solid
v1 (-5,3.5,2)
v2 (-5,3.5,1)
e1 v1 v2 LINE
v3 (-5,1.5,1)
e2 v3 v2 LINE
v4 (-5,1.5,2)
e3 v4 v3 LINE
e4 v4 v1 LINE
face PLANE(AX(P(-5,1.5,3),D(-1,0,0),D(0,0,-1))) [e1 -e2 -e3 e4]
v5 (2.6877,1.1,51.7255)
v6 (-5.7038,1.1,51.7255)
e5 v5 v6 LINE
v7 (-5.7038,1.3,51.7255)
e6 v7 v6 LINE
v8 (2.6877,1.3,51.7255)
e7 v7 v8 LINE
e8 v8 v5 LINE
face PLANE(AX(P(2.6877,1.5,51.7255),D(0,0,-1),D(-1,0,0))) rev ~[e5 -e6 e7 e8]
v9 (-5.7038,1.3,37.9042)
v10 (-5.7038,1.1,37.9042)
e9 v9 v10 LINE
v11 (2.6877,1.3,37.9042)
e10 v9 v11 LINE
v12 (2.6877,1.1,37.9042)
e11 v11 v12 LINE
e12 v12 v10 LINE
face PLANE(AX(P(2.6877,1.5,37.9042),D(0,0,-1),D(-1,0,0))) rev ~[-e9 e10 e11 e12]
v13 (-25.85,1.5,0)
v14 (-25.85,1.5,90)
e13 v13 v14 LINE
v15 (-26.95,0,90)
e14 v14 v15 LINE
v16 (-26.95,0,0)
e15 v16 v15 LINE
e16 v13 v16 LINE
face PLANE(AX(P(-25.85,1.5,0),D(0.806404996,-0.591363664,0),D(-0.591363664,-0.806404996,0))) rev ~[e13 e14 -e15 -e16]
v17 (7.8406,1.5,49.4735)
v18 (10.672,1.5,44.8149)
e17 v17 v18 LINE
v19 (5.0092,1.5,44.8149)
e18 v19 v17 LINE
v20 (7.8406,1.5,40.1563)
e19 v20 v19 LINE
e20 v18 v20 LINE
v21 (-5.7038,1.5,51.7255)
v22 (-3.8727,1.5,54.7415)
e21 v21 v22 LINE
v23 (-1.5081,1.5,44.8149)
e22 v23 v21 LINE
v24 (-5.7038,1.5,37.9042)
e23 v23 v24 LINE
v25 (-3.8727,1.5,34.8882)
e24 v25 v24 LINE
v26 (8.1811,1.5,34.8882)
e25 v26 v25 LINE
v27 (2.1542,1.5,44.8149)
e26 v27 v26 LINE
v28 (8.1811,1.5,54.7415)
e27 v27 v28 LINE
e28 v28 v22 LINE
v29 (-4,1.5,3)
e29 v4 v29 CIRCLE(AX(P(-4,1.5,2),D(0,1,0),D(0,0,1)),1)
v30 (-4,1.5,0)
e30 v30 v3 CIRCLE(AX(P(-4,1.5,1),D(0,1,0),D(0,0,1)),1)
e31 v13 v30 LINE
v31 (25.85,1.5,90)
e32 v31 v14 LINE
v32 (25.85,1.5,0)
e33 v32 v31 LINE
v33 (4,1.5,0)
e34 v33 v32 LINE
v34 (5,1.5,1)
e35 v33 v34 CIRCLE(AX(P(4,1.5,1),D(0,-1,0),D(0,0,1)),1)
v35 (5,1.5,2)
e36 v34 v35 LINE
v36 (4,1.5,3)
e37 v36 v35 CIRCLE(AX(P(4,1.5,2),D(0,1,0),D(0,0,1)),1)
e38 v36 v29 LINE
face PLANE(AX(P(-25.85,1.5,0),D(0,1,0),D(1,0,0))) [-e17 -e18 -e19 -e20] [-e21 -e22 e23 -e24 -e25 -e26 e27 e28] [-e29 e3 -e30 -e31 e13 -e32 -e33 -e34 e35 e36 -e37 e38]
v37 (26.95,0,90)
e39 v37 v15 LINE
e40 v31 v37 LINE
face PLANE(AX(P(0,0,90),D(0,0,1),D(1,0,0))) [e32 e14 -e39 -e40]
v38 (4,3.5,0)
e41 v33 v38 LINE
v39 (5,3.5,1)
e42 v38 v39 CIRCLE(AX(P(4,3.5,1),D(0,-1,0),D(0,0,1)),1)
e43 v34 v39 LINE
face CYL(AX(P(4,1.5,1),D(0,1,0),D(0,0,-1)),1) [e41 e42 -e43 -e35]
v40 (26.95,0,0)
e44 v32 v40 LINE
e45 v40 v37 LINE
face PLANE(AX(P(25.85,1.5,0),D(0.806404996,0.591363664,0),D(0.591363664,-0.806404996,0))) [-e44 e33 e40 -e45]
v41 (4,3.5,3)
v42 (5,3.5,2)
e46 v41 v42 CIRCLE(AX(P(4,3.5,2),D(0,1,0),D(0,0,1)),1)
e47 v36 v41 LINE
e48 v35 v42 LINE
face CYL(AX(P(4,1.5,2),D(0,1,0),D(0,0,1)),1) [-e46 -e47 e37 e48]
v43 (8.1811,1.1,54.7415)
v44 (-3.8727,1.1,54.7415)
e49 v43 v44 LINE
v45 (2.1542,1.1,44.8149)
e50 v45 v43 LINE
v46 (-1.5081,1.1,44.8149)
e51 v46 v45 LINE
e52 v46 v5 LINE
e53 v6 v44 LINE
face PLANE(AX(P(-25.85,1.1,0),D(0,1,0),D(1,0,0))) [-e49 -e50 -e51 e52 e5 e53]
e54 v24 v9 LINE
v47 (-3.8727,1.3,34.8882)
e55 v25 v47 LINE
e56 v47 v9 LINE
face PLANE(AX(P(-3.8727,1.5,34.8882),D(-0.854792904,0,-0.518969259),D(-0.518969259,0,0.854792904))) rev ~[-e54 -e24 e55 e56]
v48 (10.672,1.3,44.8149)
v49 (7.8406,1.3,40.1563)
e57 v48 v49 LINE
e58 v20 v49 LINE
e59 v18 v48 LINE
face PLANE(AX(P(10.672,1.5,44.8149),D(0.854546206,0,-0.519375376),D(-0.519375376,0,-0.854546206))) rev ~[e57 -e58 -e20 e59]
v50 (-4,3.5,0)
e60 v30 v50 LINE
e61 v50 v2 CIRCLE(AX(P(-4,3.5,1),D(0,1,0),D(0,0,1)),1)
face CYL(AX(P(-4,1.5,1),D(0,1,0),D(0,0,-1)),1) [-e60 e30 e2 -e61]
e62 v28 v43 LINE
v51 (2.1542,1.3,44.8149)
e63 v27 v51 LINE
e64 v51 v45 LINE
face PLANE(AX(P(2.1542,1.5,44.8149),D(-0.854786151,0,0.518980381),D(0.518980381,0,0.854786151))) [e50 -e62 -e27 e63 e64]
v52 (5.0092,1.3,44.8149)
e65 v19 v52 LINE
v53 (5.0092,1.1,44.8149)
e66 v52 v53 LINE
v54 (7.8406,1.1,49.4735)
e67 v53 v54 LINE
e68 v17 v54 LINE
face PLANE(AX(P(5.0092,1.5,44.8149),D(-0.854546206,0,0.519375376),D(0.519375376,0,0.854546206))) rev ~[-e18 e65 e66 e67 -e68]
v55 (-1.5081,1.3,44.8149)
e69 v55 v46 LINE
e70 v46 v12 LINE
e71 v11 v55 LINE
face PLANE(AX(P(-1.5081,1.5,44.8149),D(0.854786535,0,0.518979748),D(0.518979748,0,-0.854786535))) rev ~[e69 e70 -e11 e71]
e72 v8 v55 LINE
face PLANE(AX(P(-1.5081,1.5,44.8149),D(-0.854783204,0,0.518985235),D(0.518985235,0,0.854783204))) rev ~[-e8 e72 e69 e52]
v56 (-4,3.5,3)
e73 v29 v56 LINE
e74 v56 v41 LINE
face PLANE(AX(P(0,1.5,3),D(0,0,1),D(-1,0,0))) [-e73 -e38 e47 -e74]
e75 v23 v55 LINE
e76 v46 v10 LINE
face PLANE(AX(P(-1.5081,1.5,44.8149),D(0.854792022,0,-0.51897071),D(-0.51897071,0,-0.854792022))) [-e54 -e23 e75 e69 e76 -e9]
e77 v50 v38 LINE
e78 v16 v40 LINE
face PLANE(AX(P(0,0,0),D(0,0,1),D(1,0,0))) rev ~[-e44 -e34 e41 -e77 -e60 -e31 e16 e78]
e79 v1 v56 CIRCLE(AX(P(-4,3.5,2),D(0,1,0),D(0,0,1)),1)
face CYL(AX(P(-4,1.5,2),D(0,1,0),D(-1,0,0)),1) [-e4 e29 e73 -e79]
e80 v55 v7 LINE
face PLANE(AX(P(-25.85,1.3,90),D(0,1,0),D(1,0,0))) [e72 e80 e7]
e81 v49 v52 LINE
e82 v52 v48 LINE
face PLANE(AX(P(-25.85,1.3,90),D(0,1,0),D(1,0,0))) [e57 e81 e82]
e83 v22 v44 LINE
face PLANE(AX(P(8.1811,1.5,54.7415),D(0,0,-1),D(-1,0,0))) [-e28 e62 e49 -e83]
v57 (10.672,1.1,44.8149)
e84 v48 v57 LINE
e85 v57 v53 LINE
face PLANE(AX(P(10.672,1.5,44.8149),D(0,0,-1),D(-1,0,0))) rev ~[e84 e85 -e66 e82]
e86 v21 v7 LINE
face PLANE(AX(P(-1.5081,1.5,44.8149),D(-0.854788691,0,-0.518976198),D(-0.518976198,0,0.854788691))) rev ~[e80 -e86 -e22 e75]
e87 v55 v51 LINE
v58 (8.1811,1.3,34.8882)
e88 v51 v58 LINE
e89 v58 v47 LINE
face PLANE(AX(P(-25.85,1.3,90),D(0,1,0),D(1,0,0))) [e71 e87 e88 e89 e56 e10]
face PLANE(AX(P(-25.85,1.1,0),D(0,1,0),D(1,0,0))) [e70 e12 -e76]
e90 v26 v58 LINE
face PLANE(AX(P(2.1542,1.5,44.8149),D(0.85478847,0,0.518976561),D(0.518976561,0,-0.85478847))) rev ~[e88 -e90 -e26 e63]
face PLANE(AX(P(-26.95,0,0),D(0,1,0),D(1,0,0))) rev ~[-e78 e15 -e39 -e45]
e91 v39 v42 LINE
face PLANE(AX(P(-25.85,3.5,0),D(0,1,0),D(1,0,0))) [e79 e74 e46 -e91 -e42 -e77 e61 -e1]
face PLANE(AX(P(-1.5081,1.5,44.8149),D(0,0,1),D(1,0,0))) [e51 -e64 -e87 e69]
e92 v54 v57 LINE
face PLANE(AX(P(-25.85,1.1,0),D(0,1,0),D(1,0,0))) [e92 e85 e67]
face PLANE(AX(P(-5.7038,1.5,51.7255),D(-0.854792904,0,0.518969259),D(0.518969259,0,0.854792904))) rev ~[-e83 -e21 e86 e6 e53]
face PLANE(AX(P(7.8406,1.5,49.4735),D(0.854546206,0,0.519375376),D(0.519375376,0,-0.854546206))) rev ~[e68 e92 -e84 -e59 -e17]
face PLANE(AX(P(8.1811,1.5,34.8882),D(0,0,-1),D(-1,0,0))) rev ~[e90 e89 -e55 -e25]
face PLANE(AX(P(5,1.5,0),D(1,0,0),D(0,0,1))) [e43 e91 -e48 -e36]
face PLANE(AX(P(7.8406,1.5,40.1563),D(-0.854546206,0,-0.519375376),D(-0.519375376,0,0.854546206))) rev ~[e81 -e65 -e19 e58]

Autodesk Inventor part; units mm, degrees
ref_plane "YZ Plane" through (0, 0, 0) normal (1, 0, 0) x (0, 1, 0)
ref_plane "XZ Plane" through (0, 0, 0) normal (0, 1, 0) x (-1, 0, 0)
ref_plane "XY Plane" through (0, 0, 0) normal (0, 0, 1) x (1, 0, 0)
sketch "Эскиз1" plane through (0, 0, 0) normal (0, 0, 1) x (1, 0, 0)
  line L0 (0, -0.6) -> (0, 3.6) projected
  line L1 (0, 0) -> (0, 3)
  line L2 (-24.75, 3) -> (24.75, 3)
  line L3 (-26.95, 0) -> (26.95, 0)
  line L4 (-24.75, 3) -> (-26.95, 0)
  line L5 (24.75, 3) -> (26.95, 0)
  line L6 (-25.85, 1.5) -> (25.85, 1.5)
  dimension "d1" = 3
  dimension "d3" = 49.5
  dimension "d4" = 53.9
extrude "Выдавливание1" add sketch "Эскиз1" along normal blind 90 contours L3 L4 L6 L0 | L0 L6 L5 L3
sketch "Эскиз2" plane through (-25.85, 1.5, 0) normal (0, 1, 0) x (1, 0, 0)
  line L0 (-1.1, 0) -> (52.8, 0) projected
  line L1 (20.85, 0) -> (30.85, 0)
  line L2 (30.85, 0) -> (30.85, -3)
  line L3 (30.85, -3) -> (20.85, -3)
  line L4 (20.85, -3) -> (20.85, 0)
  line L5 (25.85, 18) -> (25.85, -108) projected
  point P0 (25.85, 0)
  dimension "d7" = 10
  dimension "d8" = 3
extrude "Выдавливание2" add sketch "Эскиз2" along normal blind 2
fillet "Сопряжение1" radius 1 4 edges at (5, 2.5, 3) (5, 2.5, 0) (-5, 2.5, 3) (-5, 2.5, 0)
sketch "Эскиз7" plane through (-25.85, 1.5, 90) normal (0, 1, 0) x (1, 0, 0)
  line L0 (0, 90) -> (-1.1, 90) projected
  line L1 (45.7625, 90) -> (45.7625, 0) construction
  line L2 (45.7625, 0) -> (5.9375, 0) construction
  line L3 (5.9375, 0) -> (5.9375, 90) construction
  line L4 (5.9375, 90) -> (45.7625, 90) construction
  line L5 (51.7, 0) -> (0, 0) projected
  line L6 (-1.1, 0) -> (52.8, 0) projected
  line L7 (21.9773, 55.1118) -> (20.1462, 52.0958)
  line L8 (20.1462, 52.0958) -> (24.3419, 45.1851)
  line L9 (21.9773, 55.1118) -> (34.0311, 55.1118)
  line L10 (34.0311, 55.1118) -> (28.0042, 45.1851)
  line L11 (28.0042, 45.1851) -> (24.3419, 45.1851)
  line L12 (20.1462, 52.0958) -> (28.5377, 52.0958)
  line L13 (28.5377, 52.0958) -> (24.3419, 45.1851)
  line L14 (30.8592, 45.1851) -> (36.522, 45.1851)
  line L15 (36.522, 45.1851) -> (33.6906, 49.8437)
  line L16 (33.6906, 49.8437) -> (30.8592, 45.1851)
  line L17 (33.6906, 49.8437) -> (33.6906, 45.1851) construction
  line L18 (24.3419, 45.1851) -> (24.3419, 52.0958) construction
  line L19 (28.0042, 45.1851) -> (28.0042, 55.1118) construction
  line L20 (21.9773, 35.2585) -> (20.1462, 38.2745)
  line L21 (20.1462, 38.2745) -> (24.3419, 45.1851)
  line L22 (21.9773, 35.2585) -> (34.0311, 35.2585)
  line L23 (34.0311, 35.2585) -> (28.0042, 45.1851)
  line L24 (20.1462, 38.2745) -> (28.5377, 38.2745)
  line L25 (28.5377, 38.2745) -> (24.3419, 45.1851)
  line L26 (36.522, 45.1851) -> (33.6906, 40.5265)
  line L27 (33.6906, 40.5265) -> (30.8592, 45.1851)
  line L28 (33.6906, 40.5265) -> (33.6906, 45.1851) construction
  line L29 (24.3419, 45.1851) -> (24.3419, 38.2745) construction
  line L30 (28.0042, 45.1851) -> (28.0042, 35.2585) construction
  point P0 (25.85, 90)
  point P1 (51.7, 90)
  point P2 (25.85, 0)
emboss "Рельеф1" sketch "Эскиз7" operation cut depth 0.4 direction (0, -1, 0) contours L12 L13 L8 | L11 L23 L22 L20 L24 L25 | L14 L26 L27
sketch "Эскиз8" plane through (-25.85, 1.5, 90) normal (0, 1, 0) x (1, 0, 0)
  line L0 (30.8592, 45.1851) -> (36.522, 45.1851) projected
  line L1 (33.6906, 40.5265) -> (30.8592, 45.1851) projected
  line L2 (36.522, 45.1851) -> (33.6906, 40.5265) projected
  line L3 (24.3419, 45.1851) -> (28.0042, 45.1851) projected
  line L4 (28.5377, 38.2745) -> (24.3419, 45.1851) projected
  line L5 (20.1462, 38.2745) -> (28.5377, 38.2745) projected
  line L6 (21.9773, 35.2585) -> (20.1462, 38.2745) projected
  line L7 (34.0311, 35.2585) -> (21.9773, 35.2585) projected
  line L8 (28.0042, 45.1851) -> (34.0311, 35.2585) projected
  line L9 (20.1462, 52.0958) -> (28.5377, 52.0958) projected
  line L10 (24.3419, 45.1851) -> (20.1462, 52.0958) projected
  line L11 (28.5377, 52.0958) -> (24.3419, 45.1851) projected
  line L12 (33.6906, 49.8437) -> (30.8592, 45.1851)
  line L13 (36.522, 45.1851) -> (33.6906, 49.8437)
  line L14 (28.5377, 52.0958) -> (24.3419, 45.1851)
  line L15 (20.1462, 52.0958) -> (28.5377, 52.0958)
  line L16 (21.9773, 55.1118) -> (20.1462, 52.0958)
  line L17 (34.0311, 55.1118) -> (21.9773, 55.1118)
  line L18 (28.0042, 45.1851) -> (34.0311, 55.1118)
  line L19 (20.1462, 38.2745) -> (28.5377, 38.2745)
  line L20 (24.3419, 45.1851) -> (20.1462, 38.2745)
  line L21 (28.5377, 38.2745) -> (24.3419, 45.1851)
  point P0 (25.85, 90)
extrude "Выдавливание3" cut sketch "Эскиз8" against normal blind 0.2 contours L12 L13 L0 | L11 L9 L16 L17 L18 L3 | L4 L5 L20
properties part number "cover2_3DПЕЧАТЬ"
